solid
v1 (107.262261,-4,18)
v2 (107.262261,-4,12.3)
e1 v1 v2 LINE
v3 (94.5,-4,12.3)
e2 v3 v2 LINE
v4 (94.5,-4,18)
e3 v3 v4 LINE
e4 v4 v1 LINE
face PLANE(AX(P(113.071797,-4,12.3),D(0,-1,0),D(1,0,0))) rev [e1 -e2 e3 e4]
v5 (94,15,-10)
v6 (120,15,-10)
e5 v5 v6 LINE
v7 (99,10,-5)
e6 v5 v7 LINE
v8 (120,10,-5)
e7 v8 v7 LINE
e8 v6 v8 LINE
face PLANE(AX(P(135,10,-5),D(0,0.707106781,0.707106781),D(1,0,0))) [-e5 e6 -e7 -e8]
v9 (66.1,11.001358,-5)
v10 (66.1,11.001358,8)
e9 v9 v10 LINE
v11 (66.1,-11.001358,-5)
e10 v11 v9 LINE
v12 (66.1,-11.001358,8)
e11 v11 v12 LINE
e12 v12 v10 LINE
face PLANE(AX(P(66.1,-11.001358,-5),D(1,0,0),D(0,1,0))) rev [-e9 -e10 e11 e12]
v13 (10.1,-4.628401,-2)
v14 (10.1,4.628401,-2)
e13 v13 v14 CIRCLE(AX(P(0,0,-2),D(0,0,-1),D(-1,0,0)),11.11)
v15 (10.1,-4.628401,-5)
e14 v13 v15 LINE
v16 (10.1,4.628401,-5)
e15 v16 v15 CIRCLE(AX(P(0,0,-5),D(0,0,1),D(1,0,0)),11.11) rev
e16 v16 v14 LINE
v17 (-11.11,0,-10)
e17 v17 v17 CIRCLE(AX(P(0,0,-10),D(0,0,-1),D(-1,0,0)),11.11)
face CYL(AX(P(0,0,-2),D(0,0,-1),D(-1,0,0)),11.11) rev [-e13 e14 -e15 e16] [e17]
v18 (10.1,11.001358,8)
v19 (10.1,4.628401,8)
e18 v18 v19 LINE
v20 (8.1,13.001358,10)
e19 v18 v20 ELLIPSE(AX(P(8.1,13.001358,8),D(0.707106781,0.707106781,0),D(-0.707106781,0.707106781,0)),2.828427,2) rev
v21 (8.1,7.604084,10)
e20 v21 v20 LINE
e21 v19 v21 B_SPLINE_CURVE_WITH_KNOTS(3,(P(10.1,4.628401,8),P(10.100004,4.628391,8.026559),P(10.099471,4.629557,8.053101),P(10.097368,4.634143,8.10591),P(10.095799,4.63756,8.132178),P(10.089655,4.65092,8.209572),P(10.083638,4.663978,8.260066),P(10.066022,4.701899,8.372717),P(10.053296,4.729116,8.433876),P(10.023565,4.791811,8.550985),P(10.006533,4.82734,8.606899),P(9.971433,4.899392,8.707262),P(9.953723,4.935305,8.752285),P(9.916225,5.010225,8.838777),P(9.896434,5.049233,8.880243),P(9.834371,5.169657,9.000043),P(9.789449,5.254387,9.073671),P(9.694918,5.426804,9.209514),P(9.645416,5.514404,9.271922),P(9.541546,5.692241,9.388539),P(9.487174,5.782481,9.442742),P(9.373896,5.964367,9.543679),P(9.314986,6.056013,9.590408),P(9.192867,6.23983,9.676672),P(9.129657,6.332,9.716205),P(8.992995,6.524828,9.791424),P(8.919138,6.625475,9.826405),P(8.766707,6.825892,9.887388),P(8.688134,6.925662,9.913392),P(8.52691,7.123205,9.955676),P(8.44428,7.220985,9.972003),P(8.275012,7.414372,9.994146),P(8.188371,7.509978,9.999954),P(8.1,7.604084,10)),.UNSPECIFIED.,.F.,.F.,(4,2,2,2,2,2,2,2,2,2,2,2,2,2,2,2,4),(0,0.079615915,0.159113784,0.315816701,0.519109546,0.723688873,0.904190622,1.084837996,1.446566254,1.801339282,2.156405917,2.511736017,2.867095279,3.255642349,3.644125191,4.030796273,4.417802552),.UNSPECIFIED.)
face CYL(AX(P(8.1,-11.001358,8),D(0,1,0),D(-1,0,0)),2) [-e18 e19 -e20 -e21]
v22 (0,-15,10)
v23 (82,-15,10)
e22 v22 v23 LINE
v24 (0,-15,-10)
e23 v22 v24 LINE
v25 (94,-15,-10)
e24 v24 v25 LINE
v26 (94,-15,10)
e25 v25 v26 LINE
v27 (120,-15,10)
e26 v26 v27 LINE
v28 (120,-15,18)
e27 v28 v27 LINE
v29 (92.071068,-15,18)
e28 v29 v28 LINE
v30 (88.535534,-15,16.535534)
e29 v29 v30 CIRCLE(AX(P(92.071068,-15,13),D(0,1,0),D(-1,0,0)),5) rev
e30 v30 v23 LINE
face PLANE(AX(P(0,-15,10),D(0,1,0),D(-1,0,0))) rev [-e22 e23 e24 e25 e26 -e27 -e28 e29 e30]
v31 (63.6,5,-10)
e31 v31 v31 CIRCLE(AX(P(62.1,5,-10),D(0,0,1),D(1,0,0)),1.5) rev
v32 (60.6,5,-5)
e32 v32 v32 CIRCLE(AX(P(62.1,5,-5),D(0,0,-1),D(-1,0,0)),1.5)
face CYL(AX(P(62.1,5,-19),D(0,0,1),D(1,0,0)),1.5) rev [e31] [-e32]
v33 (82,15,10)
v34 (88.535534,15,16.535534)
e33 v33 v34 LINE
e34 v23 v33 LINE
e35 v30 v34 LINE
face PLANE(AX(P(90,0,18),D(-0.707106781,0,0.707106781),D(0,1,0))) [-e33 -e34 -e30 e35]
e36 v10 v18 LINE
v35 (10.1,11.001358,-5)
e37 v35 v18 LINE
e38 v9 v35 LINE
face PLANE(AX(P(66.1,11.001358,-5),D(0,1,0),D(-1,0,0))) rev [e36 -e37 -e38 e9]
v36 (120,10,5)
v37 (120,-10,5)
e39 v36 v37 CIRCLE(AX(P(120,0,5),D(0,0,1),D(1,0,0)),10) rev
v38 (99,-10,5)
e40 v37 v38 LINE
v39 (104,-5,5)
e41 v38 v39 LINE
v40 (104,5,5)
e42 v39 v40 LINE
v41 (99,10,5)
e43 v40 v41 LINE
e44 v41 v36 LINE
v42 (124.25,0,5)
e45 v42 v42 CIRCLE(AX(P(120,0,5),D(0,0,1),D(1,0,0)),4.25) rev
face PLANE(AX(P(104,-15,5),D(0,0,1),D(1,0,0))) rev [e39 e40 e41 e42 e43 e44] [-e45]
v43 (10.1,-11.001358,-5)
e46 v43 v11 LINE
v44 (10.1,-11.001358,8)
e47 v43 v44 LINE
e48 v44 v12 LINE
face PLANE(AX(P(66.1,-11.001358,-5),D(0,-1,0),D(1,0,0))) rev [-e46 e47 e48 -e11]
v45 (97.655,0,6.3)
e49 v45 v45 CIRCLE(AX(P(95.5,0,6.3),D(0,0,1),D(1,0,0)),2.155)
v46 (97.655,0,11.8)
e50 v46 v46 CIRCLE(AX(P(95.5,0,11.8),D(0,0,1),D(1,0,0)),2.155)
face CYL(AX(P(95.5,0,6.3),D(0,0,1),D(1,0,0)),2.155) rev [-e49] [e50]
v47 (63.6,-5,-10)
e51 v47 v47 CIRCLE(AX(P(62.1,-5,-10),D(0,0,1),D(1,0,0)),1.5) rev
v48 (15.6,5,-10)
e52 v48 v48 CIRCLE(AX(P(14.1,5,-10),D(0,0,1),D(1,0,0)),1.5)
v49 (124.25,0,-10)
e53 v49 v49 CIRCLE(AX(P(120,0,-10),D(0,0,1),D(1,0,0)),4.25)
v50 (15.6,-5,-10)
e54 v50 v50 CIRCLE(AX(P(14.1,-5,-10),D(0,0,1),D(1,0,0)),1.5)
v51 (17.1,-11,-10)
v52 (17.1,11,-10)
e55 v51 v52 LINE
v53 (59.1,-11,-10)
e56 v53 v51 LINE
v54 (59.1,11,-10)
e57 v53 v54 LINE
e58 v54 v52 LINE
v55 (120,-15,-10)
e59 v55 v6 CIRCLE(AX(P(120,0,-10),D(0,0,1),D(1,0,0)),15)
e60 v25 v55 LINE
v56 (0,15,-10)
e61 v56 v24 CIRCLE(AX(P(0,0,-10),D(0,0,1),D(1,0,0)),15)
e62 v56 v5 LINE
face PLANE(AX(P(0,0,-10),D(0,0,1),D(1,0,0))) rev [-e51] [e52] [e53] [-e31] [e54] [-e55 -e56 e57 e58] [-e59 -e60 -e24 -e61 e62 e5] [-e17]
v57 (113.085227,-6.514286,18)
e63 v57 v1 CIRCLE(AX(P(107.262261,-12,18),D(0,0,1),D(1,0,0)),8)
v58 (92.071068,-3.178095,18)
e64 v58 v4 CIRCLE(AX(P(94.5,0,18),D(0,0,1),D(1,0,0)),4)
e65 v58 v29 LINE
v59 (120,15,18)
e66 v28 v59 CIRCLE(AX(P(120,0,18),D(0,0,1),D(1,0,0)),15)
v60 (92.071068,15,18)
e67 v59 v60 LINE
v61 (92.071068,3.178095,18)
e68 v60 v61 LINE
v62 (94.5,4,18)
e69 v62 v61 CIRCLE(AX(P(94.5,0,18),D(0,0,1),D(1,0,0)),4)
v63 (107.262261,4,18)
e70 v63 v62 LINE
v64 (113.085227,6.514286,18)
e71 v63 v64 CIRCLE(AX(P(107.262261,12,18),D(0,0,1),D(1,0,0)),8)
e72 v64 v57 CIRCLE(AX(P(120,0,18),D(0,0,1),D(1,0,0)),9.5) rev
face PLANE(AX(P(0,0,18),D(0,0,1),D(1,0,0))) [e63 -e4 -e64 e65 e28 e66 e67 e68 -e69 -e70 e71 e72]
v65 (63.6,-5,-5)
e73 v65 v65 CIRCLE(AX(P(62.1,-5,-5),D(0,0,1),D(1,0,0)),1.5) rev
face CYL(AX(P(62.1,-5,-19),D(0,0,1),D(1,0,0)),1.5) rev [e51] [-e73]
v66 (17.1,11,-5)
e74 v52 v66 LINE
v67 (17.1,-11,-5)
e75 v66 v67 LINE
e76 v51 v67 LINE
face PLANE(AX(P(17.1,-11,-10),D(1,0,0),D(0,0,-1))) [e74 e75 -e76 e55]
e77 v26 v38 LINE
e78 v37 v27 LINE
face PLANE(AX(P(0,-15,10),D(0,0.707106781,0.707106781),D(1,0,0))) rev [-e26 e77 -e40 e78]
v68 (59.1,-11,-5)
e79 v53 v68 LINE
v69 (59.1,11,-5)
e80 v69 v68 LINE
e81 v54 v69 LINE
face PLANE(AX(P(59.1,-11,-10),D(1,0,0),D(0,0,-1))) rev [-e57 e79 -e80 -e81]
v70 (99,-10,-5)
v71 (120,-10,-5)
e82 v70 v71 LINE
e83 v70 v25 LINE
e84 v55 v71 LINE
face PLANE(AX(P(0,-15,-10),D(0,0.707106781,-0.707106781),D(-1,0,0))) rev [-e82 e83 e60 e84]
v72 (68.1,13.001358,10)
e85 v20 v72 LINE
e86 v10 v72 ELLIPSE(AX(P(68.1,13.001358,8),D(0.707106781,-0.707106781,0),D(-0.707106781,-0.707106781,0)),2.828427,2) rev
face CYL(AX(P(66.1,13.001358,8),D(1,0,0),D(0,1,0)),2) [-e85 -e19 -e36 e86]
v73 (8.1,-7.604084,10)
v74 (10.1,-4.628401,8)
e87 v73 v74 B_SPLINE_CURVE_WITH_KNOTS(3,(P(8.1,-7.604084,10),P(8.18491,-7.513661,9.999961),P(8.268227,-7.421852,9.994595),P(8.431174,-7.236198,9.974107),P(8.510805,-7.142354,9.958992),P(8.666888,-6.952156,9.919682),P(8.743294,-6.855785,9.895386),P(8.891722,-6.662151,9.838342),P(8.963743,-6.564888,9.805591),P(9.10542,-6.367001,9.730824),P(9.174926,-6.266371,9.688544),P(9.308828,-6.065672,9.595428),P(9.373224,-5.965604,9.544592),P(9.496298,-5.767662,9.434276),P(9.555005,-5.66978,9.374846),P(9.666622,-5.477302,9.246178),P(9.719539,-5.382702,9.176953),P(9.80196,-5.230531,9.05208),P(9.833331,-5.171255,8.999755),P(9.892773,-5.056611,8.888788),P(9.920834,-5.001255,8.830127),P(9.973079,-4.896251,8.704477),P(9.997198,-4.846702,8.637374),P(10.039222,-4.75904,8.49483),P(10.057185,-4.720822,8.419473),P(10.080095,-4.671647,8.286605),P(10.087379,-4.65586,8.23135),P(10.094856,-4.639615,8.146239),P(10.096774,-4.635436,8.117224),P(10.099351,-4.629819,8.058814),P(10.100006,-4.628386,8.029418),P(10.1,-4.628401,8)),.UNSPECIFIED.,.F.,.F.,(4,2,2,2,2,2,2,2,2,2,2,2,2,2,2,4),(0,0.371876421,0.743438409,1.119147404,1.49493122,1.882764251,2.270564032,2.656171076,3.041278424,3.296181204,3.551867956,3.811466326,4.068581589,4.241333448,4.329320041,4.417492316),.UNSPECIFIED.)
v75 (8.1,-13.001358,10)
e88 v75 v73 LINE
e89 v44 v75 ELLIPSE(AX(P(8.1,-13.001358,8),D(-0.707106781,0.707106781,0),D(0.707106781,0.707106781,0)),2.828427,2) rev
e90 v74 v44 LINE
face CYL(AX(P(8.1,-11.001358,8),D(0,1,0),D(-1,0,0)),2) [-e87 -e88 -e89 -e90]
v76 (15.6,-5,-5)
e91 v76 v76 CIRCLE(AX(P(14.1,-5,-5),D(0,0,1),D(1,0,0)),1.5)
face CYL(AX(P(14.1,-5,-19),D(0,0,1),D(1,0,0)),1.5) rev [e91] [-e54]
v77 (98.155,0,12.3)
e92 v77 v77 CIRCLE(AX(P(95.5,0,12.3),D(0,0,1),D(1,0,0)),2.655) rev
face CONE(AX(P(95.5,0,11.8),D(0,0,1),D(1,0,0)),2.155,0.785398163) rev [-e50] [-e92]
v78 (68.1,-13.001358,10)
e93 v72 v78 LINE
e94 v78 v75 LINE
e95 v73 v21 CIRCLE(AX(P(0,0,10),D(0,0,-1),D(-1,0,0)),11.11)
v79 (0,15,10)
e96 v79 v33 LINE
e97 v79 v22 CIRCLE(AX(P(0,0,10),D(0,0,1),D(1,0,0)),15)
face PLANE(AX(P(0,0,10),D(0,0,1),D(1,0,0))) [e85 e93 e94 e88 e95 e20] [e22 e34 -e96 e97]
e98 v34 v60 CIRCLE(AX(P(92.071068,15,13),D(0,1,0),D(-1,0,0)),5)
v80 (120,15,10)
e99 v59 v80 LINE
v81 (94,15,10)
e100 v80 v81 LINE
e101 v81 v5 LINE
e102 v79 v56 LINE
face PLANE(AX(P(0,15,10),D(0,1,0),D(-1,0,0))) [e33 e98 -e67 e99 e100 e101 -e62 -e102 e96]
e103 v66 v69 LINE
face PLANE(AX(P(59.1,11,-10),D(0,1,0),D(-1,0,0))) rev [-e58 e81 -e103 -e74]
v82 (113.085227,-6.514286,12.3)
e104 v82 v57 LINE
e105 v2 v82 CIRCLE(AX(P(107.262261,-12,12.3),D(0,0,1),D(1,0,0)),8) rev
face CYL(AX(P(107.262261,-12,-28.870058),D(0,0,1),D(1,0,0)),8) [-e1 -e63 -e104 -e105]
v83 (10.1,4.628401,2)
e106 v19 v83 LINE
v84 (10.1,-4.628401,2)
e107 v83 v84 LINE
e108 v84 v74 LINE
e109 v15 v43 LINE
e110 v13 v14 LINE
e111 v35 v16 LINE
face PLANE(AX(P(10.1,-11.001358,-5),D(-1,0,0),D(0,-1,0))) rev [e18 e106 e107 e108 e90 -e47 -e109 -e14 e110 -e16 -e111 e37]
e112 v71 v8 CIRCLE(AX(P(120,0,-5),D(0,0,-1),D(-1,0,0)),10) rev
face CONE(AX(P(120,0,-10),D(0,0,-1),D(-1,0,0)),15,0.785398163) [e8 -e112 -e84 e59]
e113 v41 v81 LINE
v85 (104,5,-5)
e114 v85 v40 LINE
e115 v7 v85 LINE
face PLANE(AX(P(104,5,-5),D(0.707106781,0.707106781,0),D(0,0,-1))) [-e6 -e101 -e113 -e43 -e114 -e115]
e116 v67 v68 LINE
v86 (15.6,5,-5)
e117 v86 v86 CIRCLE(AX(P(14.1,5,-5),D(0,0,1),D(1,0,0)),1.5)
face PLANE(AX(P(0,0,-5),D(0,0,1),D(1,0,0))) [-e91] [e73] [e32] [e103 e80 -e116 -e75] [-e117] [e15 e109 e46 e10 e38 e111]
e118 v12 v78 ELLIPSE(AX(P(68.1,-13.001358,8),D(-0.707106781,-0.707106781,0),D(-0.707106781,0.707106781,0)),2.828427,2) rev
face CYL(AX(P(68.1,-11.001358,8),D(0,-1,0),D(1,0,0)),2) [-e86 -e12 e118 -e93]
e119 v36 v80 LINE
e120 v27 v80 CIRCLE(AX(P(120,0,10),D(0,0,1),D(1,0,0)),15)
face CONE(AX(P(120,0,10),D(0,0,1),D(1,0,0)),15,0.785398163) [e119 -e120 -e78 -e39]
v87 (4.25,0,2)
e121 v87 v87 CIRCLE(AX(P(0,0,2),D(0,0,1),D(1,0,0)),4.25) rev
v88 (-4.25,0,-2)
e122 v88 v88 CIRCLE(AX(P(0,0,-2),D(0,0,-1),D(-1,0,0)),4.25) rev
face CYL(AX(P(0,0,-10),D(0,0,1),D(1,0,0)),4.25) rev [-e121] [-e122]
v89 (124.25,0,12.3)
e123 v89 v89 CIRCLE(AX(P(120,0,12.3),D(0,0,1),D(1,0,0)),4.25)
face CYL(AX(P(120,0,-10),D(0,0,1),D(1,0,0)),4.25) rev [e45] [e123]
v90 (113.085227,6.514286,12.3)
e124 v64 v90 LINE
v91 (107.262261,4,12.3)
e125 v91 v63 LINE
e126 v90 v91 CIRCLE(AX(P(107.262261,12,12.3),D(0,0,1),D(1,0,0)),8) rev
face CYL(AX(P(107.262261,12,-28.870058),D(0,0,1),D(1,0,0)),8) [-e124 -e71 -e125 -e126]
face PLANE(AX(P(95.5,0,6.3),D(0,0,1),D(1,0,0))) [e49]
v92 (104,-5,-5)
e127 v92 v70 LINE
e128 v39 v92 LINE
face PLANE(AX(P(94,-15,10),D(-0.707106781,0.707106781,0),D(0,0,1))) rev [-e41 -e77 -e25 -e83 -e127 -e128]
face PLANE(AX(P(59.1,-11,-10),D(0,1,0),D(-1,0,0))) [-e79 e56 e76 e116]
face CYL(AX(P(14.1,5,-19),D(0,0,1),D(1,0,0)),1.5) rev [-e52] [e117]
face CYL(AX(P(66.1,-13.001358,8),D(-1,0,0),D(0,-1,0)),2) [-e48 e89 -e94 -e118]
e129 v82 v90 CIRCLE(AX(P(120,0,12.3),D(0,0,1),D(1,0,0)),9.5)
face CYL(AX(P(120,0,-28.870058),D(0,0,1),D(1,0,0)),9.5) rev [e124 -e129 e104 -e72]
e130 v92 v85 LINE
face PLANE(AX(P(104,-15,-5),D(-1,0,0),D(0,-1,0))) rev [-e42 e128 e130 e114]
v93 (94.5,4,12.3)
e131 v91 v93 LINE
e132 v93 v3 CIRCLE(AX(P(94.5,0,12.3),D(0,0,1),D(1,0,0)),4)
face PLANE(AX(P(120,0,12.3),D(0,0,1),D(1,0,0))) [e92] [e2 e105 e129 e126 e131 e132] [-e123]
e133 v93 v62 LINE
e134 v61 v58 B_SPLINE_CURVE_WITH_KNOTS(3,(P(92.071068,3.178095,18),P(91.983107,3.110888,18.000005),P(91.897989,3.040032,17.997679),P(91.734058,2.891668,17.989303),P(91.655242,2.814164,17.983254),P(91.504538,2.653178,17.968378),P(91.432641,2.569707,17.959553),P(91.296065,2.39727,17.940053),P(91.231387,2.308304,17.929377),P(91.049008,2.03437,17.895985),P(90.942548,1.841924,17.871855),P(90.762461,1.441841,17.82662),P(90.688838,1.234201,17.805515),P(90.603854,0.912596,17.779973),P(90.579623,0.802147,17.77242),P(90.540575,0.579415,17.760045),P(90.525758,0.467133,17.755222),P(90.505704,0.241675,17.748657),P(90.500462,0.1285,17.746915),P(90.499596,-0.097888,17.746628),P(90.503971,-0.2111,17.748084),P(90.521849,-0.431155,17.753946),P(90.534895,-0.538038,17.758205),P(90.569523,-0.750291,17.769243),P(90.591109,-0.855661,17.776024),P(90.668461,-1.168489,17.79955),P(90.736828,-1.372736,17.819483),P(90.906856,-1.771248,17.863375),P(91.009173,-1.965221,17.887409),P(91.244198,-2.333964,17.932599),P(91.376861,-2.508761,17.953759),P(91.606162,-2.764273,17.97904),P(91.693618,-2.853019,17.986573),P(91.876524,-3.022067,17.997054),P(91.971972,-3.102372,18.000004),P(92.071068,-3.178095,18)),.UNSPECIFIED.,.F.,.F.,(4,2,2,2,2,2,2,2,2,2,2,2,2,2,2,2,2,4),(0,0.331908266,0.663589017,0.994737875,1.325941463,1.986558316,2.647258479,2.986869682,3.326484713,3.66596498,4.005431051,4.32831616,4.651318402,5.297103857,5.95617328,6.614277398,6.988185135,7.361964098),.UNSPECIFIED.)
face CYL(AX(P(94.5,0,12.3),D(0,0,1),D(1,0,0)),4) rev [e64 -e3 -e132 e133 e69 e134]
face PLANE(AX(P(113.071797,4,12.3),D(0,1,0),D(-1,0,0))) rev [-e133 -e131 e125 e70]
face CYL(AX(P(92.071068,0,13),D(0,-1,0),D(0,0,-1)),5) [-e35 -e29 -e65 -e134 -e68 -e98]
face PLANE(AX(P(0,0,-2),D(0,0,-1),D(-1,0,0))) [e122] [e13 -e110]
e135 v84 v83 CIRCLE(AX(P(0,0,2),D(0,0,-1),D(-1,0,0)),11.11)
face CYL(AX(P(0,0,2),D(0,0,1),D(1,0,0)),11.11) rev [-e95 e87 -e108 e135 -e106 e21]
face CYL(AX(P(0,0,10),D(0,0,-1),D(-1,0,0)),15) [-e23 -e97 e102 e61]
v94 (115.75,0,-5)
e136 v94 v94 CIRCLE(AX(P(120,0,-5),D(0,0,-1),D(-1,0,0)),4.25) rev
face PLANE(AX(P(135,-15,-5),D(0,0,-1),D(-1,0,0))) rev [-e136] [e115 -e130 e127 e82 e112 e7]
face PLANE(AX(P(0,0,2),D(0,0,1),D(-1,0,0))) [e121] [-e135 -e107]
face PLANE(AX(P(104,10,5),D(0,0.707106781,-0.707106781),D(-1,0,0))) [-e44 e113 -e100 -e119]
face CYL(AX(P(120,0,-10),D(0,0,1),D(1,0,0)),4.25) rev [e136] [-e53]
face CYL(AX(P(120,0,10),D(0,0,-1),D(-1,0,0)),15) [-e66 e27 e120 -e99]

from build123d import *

# Parameters (mm, degrees)
BOSS_EXTRUDE1_DEPTH = 10
SKETCH3_3_R         = 4.25
CUT_EXTRUDE5_DEPTH  = 12
SKETCH3_R           = 4.25
CUT_EXTRUDE6_DEPTH  = 138.295302177
SKETCH4_R           = 4.25
SKETCH4_W           = 42
SKETCH4_H           = 22
CUT_EXTRUDE8_DEPTH  = 138.295302177
SKETCH5_R           = 11.11
CUT_EXTRUDE10_DEPTH = 8
SKETCH7_W           = 56
SKETCH7_H           = 22.002715538
CUT_EXTRUDE12_DEPTH = 15
SKETCH8_R           = 1.5
CUT_EXTRUDE13_DEPTH = 14
SKETCH9_R           = 9.5
CUT_EXTRUDE14_DEPTH = 12
BOSS_EXTRUDE2_START = 8
SKETCH16_R          = 9.5
BOSS_EXTRUDE2_DEPTH = 8
CHAMFER1_SIZE       = 10
FILLET1_R           = 5
FILLET2_R           = 2
BOSS_EXTRUDE3_START = 14.3
SKETCH18_R          = 9.5
SKETCH18_R_2        = 4.25
BOSS_EXTRUDE3_DEPTH = 14.3
CUT_EXTRUDE15_DEPTH = 5.7
SKETCH19_R          = 2.155
CUT_EXTRUDE16_DEPTH = 6
CHAMFER2_SIZE       = 0.5
FILLET3_R           = 8
SKETCH20_W          = 31
SKETCH20_H          = 10
CUT_EXTRUDE17_DEPTH = 140.459671624
CHAMFER4_SIZE       = 5
CHAMFER5_SIZE       = 10


# Some blends are built 0.0001 mm under size
with BuildPart() as part:
    # Sketch1 → Boss-Extrude1 (new, symmetric)
    with BuildSketch(Plane.XY):
        with BuildLine():
            Line((120, 15), (0, 15))
            ThreePointArc((0, 15), (-15, 0), (0, -15))
            Line((0, -15), (120, -15))
            ThreePointArc((120, -15), (135, 0), (120, 15))
        make_face()
    extrude(amount=BOSS_EXTRUDE1_DEPTH, both=True)

    # Sketch3<3> → Cut-Extrude5 (cut)
    with BuildSketch(Plane.XY.offset(10)):
        with BuildLine():
            Line((120, 7.5), (118.514851485, 7.351485149))
            ThreePointArc((118.514851485, 7.351485149), (112.5, 0), (118.514851485, -7.351485149))
            Line((118.514851485, -7.351485149), (120, -7.5))
            ThreePointArc((120, -7.5), (125.303300859, -5.303300859), (127.5, 0))
            ThreePointArc((127.5, 0), (125.303300859, 5.303300859), (120, 7.5))
        make_face()
        with Locations((120, 0)):
            Circle(SKETCH3_3_R, mode=Mode.SUBTRACT)
    extrude(amount=-CUT_EXTRUDE5_DEPTH, mode=Mode.SUBTRACT)

    # Sketch3 → Cut-Extrude6 (cut, through all)
    with BuildSketch(Plane.XY.offset(10)):
        with Locations((120, 0)):
            Circle(SKETCH3_R)
    extrude(amount=-CUT_EXTRUDE6_DEPTH, mode=Mode.SUBTRACT)

    # Sketch4 → Cut-Extrude8 (cut, through all)
    with BuildSketch(Plane.XY.offset(10)):
        Circle(SKETCH4_R)
        with Locations((38.1, 0)):
            Rectangle(SKETCH4_W, SKETCH4_H)
    extrude(amount=-CUT_EXTRUDE8_DEPTH, mode=Mode.SUBTRACT)

    # Sketch5 → Cut-Extrude10 (cut)
    with BuildSketch(Plane(origin=(0, 0, -10), x_dir=(-1, 0, 0), z_dir=(0, 0, -1))):
        Circle(SKETCH5_R)
    cut_extrude10 = extrude(amount=-CUT_EXTRUDE10_DEPTH, mode=Mode.SUBTRACT)

    # Mirror2: Cut-Extrude10 across plane
    add(cut_extrude10.mirror(Plane.XY), mode=Mode.SUBTRACT)

    # Sketch7 → Cut-Extrude12 (cut)
    with BuildSketch(Plane.XY.offset(10)):
        with Locations((38.1, 0)):
            Rectangle(SKETCH7_W, SKETCH7_H)
    extrude(amount=-CUT_EXTRUDE12_DEPTH, mode=Mode.SUBTRACT)

    # Sketch8 → Cut-Extrude13 (cut)
    with BuildSketch(Plane.XY.offset(-5)):
        with Locations((14.1, 5)):
            Circle(SKETCH8_R)
        with Locations((14.1, -5)):
            Circle(SKETCH8_R)
        with Locations((62.1, -5)):
            Circle(SKETCH8_R)
        with Locations((62.1, 5)):
            Circle(SKETCH8_R)
    extrude(amount=-CUT_EXTRUDE13_DEPTH, mode=Mode.SUBTRACT)

    # Sketch9 → Cut-Extrude14 (cut)
    with BuildSketch(Plane.XY.offset(10)):
        with Locations((120, 0)):
            Circle(SKETCH9_R)
    extrude(amount=-CUT_EXTRUDE14_DEPTH, mode=Mode.SUBTRACT)

    # Sketch16 → Boss-Extrude2 (add)
    with BuildSketch(Plane.XY.offset(10).offset(BOSS_EXTRUDE2_START)):
        with BuildLine():
            ThreePointArc((120, -15), (135, 0), (120, 15))
            Line((120, 15), (80, 15))
            Line((80, 15), (80, -15))
            Line((80, -15), (120, -15))
        make_face()
        with Locations((120, 0)):
            Circle(SKETCH16_R, mode=Mode.SUBTRACT)
    extrude(amount=-BOSS_EXTRUDE2_DEPTH)

    # Chamfer1
    # the kernel refuses this chamfer: 10 mm, written as the material it takes off along each edge
    with BuildSketch(Plane(origin=(80, 40.71682988, 18), x_dir=(-0.027495876610586317, 0, -0.9996219169112968), z_dir=(0, -1, 0))) as chamfer1_piece_1_section:
        Polygon((CHAMFER1_SIZE * 0.999621916911, CHAMFER1_SIZE * 0.0274958766106), (-CHAMFER1_SIZE * 0.0274958766106, CHAMFER1_SIZE * 0.999621916911), (0, 0), align=None)
    chamfer1_piece_1 = extrude(amount=81.433659759, mode=Mode.PRIVATE)
    chamfer1_piece_1 = split(chamfer1_piece_1, bisect_by=Plane(origin=(83.457184123, 0, 10), z_dir=(0, 0, 1)), keep=Keep.TOP, mode=Mode.PRIVATE)
    add(chamfer1_piece_1, mode=Mode.SUBTRACT)

    # Fillet1
    fillet1_edges = [part.edges().sort_by_distance(p)[0] for p in [
        (90, 0, 18),
    ]]
    fillet(fillet1_edges, radius=FILLET1_R)

    # Fillet2
    fillet2_edges = [part.edges().sort_by_distance(p)[0] for p in [
        (10.1, -7.81487961, 10),
        (38.1, -11.001357769, 10),
        (66.1, 0, 10),
        (38.1, 11.001357769, 10),
        (10.1, 7.81487961, 10),
    ]]
    fillet(fillet2_edges, radius=FILLET2_R)

    # Sketch18 → Boss-Extrude3 (add)
    with BuildSketch(Plane.XY.offset(-2).offset(BOSS_EXTRUDE3_START)):
        with Locations((120, 0)):
            Circle(SKETCH18_R)
        with Locations((120, 0)):
            Circle(SKETCH18_R_2, mode=Mode.SUBTRACT)
    extrude(amount=-BOSS_EXTRUDE3_DEPTH)

    # Sketch17 → Cut-Extrude15 (cut)
    with BuildSketch(Plane.XY.offset(18)):
        with BuildLine():
            Line((113.07179677, -4), (94.5, -4))
            ThreePointArc((94.5, -4), (90.5, 0), (94.5, 4))
            Line((94.5, 4), (113.07179677, 4))
            ThreePointArc((113.07179677, 4), (128, 0), (113.07179677, -4))
        make_face()
    extrude(amount=-CUT_EXTRUDE15_DEPTH, mode=Mode.SUBTRACT)

    # Sketch19 → Cut-Extrude16 (cut)
    with BuildSketch(Plane.XY.offset(12.3)):
        with Locations((95.5, 0)):
            Circle(SKETCH19_R)
    extrude(amount=-CUT_EXTRUDE16_DEPTH, mode=Mode.SUBTRACT)

    # Chamfer2
    chamfer2_edges = [part.edges().sort_by_distance(p)[0] for p in [
        (93.345, 0, 12.3),
    ]]
    chamfer(chamfer2_edges, length=CHAMFER2_SIZE)

    # Fillet3
    fillet3_edges = [part.edges().sort_by_distance(p)[0] for p in [
        (111.38315603, 4, 15.15),
        (111.38315603, -4, 15.15),
    ]]
    fillet(fillet3_edges, radius=FILLET3_R)

    # Sketch20 → Cut-Extrude17 (cut, through all)
    with BuildSketch(Plane(origin=(0, 15, 0), x_dir=(1, 0, 0), z_dir=(0, 1, 0))):
        with Locations((119.5, 0)):
            Rectangle(SKETCH20_W, SKETCH20_H)
    extrude(amount=-CUT_EXTRUDE17_DEPTH, mode=Mode.SUBTRACT)

    # Chamfer4
    chamfer4_edges = [part.edges().sort_by_distance(p)[0] for p in [
        (112, 15, 5),
        (112, 15, -5),
        (135, 0, 5),
        (112, -15, 5),
        (135, 0, -5),
        (112, -15, -5),
    ]]
    chamfer(chamfer4_edges, length=CHAMFER4_SIZE - 0.0001)  # a hair under: the kernel refuses the full size

    # Chamfer5
    chamfer5_edges = [part.edges().sort_by_distance(p)[0] for p in [
        (104, 15, 0),
        (104, -15, 0),
    ]]
    chamfer(chamfer5_edges, length=CHAMFER5_SIZE)


solid = part.part
